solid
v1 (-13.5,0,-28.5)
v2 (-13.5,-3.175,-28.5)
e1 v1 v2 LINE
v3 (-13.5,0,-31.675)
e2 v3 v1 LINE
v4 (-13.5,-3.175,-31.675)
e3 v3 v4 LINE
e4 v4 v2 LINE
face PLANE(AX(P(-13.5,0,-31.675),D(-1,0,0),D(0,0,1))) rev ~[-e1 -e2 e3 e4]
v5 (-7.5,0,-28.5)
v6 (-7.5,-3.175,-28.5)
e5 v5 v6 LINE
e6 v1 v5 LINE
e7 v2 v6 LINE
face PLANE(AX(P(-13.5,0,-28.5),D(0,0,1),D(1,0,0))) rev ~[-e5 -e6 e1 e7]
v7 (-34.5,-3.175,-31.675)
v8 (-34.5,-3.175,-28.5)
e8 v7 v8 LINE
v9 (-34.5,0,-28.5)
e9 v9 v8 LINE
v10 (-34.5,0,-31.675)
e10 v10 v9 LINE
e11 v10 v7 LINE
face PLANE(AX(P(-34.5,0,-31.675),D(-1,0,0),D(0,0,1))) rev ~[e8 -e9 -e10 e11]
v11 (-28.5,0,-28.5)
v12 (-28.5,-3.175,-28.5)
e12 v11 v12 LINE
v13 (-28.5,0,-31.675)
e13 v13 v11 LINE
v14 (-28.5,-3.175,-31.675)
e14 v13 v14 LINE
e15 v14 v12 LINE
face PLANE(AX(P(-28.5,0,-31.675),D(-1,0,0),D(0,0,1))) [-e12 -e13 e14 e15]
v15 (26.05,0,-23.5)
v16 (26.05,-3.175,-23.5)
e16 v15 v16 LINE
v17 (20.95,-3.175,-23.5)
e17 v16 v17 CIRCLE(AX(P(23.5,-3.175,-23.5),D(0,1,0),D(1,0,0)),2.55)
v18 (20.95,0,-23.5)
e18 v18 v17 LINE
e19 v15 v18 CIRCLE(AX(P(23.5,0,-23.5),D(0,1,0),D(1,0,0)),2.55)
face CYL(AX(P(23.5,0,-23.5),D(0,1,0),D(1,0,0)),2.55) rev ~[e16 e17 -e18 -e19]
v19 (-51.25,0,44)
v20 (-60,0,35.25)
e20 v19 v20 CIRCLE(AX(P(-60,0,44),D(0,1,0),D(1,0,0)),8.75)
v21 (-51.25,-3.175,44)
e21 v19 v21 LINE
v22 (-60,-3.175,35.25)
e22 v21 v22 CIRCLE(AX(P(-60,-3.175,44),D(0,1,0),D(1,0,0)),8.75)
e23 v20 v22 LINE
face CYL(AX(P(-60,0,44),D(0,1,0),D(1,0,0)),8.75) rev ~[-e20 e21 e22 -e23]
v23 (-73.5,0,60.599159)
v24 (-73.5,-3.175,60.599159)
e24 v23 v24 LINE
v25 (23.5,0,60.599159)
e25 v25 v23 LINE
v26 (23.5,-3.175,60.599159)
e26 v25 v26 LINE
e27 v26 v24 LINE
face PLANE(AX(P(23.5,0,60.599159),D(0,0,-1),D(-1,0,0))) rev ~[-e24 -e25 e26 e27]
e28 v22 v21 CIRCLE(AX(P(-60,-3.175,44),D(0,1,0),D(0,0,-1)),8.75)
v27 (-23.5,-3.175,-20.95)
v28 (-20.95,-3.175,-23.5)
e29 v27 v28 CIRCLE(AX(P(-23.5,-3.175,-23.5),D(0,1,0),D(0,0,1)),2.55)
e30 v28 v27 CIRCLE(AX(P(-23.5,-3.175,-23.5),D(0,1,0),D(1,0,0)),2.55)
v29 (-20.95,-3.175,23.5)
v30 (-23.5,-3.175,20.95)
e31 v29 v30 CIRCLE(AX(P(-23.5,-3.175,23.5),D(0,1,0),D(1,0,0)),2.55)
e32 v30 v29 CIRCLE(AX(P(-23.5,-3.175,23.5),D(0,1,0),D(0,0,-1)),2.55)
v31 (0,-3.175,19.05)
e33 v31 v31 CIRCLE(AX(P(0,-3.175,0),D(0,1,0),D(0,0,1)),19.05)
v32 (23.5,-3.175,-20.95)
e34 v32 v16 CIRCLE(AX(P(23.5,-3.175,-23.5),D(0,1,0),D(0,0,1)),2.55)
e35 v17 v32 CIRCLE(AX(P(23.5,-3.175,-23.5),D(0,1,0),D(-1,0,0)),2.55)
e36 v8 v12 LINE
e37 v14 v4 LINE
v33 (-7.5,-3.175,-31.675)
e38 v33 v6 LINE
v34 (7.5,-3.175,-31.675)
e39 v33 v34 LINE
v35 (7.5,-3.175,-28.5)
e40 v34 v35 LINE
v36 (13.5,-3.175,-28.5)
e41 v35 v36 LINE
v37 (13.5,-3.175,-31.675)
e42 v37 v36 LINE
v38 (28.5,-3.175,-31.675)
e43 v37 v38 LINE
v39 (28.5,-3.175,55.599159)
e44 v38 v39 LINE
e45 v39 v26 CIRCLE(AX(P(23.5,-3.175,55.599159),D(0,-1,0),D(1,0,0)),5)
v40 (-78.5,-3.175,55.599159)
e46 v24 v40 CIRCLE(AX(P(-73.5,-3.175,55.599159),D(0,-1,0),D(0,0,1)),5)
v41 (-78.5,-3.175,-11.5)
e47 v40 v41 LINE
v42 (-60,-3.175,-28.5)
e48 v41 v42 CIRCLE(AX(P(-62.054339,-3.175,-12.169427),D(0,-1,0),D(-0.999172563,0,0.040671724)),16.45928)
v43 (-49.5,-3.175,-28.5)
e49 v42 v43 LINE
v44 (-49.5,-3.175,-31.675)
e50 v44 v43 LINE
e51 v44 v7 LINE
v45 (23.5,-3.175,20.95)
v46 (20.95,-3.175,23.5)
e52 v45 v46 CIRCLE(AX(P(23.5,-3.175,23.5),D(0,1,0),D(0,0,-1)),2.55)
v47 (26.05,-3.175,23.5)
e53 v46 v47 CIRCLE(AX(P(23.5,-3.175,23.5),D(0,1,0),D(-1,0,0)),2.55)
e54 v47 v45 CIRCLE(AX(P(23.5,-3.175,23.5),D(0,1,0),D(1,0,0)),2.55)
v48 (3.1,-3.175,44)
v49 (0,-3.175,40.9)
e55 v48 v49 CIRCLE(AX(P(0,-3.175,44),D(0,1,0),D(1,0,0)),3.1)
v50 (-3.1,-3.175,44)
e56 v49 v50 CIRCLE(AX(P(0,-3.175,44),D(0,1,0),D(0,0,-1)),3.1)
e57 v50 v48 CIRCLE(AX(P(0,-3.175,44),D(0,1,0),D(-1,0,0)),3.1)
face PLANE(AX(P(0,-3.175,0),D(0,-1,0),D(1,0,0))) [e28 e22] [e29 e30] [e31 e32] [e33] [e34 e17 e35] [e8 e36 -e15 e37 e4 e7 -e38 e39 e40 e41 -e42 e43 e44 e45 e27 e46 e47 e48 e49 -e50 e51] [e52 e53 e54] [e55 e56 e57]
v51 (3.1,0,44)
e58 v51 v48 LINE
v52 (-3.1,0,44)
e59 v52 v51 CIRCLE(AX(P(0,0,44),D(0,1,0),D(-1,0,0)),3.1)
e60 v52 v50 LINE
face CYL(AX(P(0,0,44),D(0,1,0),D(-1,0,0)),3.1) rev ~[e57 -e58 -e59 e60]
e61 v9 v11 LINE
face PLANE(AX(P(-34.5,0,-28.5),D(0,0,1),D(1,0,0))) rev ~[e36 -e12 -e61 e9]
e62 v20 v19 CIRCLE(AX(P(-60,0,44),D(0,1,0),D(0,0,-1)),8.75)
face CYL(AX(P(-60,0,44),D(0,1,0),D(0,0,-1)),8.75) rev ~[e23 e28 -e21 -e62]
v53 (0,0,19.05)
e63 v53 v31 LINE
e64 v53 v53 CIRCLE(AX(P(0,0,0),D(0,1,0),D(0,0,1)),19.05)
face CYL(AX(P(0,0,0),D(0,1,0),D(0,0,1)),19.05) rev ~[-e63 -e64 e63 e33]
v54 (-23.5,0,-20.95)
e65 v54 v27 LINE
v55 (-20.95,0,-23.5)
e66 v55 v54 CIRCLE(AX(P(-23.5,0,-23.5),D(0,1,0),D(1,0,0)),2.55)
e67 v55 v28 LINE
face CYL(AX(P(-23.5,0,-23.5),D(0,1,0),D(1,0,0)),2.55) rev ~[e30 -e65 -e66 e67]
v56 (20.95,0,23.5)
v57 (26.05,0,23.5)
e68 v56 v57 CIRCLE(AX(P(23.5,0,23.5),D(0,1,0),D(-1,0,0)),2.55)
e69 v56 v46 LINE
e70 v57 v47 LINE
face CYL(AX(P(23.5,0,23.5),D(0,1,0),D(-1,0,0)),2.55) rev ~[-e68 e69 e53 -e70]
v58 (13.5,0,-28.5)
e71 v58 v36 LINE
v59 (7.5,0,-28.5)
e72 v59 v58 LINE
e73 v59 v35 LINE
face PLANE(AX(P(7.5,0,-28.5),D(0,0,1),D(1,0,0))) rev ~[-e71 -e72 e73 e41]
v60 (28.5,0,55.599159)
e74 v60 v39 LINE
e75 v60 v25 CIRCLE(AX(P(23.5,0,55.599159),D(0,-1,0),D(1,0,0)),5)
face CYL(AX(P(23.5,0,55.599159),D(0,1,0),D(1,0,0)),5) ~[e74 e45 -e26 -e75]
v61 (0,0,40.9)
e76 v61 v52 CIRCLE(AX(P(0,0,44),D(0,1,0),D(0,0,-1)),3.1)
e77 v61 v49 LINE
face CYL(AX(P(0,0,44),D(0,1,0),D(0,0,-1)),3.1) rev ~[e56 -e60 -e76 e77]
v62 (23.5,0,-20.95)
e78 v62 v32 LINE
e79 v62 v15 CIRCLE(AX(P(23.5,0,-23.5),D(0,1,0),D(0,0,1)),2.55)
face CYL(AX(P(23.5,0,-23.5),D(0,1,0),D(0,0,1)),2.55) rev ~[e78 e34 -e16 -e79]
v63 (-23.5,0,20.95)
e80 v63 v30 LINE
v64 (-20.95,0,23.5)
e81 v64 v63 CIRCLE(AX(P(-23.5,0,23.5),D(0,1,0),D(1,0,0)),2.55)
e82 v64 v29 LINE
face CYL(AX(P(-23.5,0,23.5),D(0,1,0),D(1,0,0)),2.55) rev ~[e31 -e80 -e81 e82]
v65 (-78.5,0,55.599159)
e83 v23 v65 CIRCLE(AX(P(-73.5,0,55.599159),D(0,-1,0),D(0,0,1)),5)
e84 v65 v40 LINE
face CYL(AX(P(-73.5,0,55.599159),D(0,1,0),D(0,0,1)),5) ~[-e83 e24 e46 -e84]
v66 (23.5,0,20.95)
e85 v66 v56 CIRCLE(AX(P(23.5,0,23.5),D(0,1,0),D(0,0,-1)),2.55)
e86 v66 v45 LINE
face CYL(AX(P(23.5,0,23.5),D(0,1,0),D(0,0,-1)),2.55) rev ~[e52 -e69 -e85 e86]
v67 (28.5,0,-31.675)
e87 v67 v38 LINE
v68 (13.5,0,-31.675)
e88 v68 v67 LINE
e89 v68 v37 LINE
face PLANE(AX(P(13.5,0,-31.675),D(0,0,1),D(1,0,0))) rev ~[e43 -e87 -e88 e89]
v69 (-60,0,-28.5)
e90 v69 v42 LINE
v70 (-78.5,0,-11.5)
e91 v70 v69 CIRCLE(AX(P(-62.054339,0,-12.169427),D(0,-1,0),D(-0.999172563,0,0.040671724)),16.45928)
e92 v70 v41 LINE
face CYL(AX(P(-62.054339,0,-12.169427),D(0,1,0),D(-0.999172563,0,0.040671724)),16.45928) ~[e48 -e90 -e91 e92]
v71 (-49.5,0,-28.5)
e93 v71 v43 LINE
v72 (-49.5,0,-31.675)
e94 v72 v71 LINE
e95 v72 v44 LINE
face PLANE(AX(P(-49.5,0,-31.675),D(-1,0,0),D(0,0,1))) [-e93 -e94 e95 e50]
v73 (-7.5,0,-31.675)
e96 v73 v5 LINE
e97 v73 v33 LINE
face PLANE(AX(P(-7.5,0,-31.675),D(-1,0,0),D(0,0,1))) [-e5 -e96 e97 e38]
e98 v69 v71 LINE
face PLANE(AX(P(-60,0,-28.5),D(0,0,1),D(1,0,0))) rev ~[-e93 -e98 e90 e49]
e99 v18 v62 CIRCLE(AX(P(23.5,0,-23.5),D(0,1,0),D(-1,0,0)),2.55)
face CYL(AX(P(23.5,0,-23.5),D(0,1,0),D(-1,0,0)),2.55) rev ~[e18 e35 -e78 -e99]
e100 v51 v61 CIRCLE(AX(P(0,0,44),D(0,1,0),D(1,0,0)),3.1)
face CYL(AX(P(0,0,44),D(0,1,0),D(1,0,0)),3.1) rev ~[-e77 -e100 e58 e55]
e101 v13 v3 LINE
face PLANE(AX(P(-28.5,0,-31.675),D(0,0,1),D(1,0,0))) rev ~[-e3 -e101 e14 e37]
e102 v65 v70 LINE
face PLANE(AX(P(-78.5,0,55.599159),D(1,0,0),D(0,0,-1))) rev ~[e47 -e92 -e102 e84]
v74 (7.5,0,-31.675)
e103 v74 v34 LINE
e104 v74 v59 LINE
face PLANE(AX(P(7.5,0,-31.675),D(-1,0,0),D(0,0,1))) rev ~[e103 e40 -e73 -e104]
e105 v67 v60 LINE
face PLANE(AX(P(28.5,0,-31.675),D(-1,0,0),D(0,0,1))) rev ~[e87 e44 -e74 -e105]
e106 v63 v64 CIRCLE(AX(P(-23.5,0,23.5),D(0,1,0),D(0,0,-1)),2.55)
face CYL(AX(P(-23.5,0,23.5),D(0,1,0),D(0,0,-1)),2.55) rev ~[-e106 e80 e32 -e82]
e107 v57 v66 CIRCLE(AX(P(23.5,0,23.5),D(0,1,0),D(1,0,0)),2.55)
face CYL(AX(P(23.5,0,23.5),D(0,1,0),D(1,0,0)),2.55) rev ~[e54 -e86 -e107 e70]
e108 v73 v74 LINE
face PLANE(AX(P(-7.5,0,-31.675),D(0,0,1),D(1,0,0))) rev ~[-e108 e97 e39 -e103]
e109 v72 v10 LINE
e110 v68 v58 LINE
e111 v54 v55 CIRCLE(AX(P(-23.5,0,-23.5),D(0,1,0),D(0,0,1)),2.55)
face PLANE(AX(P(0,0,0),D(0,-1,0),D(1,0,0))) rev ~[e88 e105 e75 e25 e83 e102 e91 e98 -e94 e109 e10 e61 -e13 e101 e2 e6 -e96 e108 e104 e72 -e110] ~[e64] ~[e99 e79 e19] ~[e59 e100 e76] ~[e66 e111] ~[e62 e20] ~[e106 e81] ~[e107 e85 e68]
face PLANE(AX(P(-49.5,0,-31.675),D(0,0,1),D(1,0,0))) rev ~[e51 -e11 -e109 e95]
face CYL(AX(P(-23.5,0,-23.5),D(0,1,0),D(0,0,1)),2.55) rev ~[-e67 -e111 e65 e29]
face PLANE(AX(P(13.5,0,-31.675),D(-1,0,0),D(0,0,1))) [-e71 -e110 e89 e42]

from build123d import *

# Parameters (mm, degrees)
F0_W     = 15
F0_H     = 3.175
F0_W_2   = 7.5
F1_DEPTH = 3.175


# Not quite as in the source:
# - a feature names something its author has since deleted; it is built from what else it names


with BuildPart() as f1:
    # F0 (on Front) → F1 (new body)
    with BuildSketch(Plane.XZ):
        Polygon((0, 28.5), (-28.5, 28.5), (-28.5, -28.5), (-13.5, -28.5), (-7.5, -28.5), (0, -28.5), (7.5, -28.5), (13.5, -28.5), (28.5, -28.5), (28.5, 23.5), (28.5, 28.5), (23.5, 28.5), align=None)
        with BuildLine():
            Line((-20.95, 23.5), (0, 23.5))
            Line((0, 23.5), (20.95, 23.5))
            ThreePointArc((20.95, 23.5), (23.5, 26.05), (26.05, 23.5))
            ThreePointArc((26.05, 23.5), (25.303122292, 21.696877708), (23.5, 20.95))
            Line((23.5, 20.95), (23.5, -20.95))
            ThreePointArc((23.5, -20.95), (25.303122292, -21.696877708), (26.05, -23.5))
            ThreePointArc((26.05, -23.5), (23.5, -26.05), (20.95, -23.5))
            Line((20.95, -23.5), (-20.95, -23.5))
            ThreePointArc((-20.95, -23.5), (-25.303122292, -25.303122292), (-23.5, -20.95))
            Line((-23.5, -20.95), (-23.5, 20.95))
            ThreePointArc((-23.5, 20.95), (-25.303122292, 25.303122292), (-20.95, 23.5))
        make_face(mode=Mode.SUBTRACT)
        with BuildLine():
            Line((-28.5, -28.5), (-28.5, 28.5))
            Line((-28.5, 28.5), (-28.5, 44))
            Line((-28.5, 44), (-51.25, 44))
            ThreePointArc((-51.25, 44), (-53.8128156646, 37.8128156646), (-60, 35.25))
            Line((-60, 35.25), (-60, -28.5))
            Line((-60, -28.5), (-49.5, -28.5))
            Line((-49.5, -28.5), (-34.5, -28.5))
            Line((-34.5, -28.5), (-28.5, -28.5))
        make_face()
        with BuildLine():
            Line((20.95, 23.5), (0, 23.5))
            Line((0, 23.5), (-20.95, 23.5))
            ThreePointArc((-20.95, 23.5), (-21.696877708, 21.696877708), (-23.5, 20.95))
            Line((-23.5, 20.95), (-23.5, -20.95))
            ThreePointArc((-23.5, -20.95), (-21.696877708, -21.696877708), (-20.95, -23.5))
            Line((-20.95, -23.5), (20.95, -23.5))
            ThreePointArc((20.95, -23.5), (21.696877708, -21.696877708), (23.5, -20.95))
            Line((23.5, -20.95), (23.5, 20.95))
            ThreePointArc((23.5, 20.95), (21.696877708, 21.696877708), (20.95, 23.5))
        make_face()
        with BuildLine():
            ThreePointArc((19.05, 0), (-13.4703841816, -13.4703841816), (0, 19.05))
            ThreePointArc((0, 19.05), (13.4703841816, 13.4703841816), (19.05, 0))
        make_face(mode=Mode.SUBTRACT)
        with BuildLine():
            Line((-51.25, 44), (-28.5, 44))
            Line((-28.5, 44), (-28.5, 60.5991594493))
            Line((-28.5, 60.5991594493), (-73.5, 60.5991594493))
            ThreePointArc((-73.5, 60.5991594493), (-77.0355339059, 59.1346933553), (-78.5, 55.5991594493))
            Line((-78.5, 55.5991594493), (-78.5, -11.5))
            ThreePointArc((-78.5, -11.5), (-73.1911039749, -24.2888484433), (-60, -28.5))
            Line((-60, -28.5), (-60, 35.25))
            ThreePointArc((-60, 35.25), (-66.1871843354, 50.1871843354), (-51.25, 44))
        make_face()
        with BuildLine():
            Line((0, 40.9), (0, 28.5))
            Line((0, 28.5), (23.5, 28.5))
            Line((23.5, 28.5), (28.5, 28.5))
            Line((28.5, 28.5), (28.5, 55.5991594493))
            ThreePointArc((28.5, 55.5991594493), (27.0355339059, 59.1346933553), (23.5, 60.5991594493))
            Line((23.5, 60.5991594493), (-28.5, 60.5991594493))
            Line((-28.5, 60.5991594493), (-28.5, 44))
            Line((-28.5, 44), (-3.1, 44))
            ThreePointArc((-3.1, 44), (0, 47.1), (3.1, 44))
            ThreePointArc((3.1, 44), (2.1920310217, 41.8079689783), (0, 40.9))
        make_face()
        with BuildLine():
            Line((-28.5, 44), (-28.5, 28.5))
            Line((-28.5, 28.5), (0, 28.5))
            Line((0, 28.5), (0, 40.9))
            ThreePointArc((0, 40.9), (-2.1920310217, 41.8079689783), (-3.1, 44))
            Line((-3.1, 44), (-28.5, 44))
        make_face()
        with Locations((21, -30.0875)):
            Rectangle(F0_W, F0_H)
        with Locations((-21, -30.0875)):
            Rectangle(F0_W, F0_H)
        with Locations((-42, -30.0875)):
            Rectangle(F0_W, F0_H)
        with Locations((3.75, -30.0875)):
            Rectangle(F0_W_2, F0_H)
        with Locations((-3.75, -30.0875)):
            Rectangle(F0_W_2, F0_H)
    extrude(amount=F1_DEPTH)


solid = f1.part
